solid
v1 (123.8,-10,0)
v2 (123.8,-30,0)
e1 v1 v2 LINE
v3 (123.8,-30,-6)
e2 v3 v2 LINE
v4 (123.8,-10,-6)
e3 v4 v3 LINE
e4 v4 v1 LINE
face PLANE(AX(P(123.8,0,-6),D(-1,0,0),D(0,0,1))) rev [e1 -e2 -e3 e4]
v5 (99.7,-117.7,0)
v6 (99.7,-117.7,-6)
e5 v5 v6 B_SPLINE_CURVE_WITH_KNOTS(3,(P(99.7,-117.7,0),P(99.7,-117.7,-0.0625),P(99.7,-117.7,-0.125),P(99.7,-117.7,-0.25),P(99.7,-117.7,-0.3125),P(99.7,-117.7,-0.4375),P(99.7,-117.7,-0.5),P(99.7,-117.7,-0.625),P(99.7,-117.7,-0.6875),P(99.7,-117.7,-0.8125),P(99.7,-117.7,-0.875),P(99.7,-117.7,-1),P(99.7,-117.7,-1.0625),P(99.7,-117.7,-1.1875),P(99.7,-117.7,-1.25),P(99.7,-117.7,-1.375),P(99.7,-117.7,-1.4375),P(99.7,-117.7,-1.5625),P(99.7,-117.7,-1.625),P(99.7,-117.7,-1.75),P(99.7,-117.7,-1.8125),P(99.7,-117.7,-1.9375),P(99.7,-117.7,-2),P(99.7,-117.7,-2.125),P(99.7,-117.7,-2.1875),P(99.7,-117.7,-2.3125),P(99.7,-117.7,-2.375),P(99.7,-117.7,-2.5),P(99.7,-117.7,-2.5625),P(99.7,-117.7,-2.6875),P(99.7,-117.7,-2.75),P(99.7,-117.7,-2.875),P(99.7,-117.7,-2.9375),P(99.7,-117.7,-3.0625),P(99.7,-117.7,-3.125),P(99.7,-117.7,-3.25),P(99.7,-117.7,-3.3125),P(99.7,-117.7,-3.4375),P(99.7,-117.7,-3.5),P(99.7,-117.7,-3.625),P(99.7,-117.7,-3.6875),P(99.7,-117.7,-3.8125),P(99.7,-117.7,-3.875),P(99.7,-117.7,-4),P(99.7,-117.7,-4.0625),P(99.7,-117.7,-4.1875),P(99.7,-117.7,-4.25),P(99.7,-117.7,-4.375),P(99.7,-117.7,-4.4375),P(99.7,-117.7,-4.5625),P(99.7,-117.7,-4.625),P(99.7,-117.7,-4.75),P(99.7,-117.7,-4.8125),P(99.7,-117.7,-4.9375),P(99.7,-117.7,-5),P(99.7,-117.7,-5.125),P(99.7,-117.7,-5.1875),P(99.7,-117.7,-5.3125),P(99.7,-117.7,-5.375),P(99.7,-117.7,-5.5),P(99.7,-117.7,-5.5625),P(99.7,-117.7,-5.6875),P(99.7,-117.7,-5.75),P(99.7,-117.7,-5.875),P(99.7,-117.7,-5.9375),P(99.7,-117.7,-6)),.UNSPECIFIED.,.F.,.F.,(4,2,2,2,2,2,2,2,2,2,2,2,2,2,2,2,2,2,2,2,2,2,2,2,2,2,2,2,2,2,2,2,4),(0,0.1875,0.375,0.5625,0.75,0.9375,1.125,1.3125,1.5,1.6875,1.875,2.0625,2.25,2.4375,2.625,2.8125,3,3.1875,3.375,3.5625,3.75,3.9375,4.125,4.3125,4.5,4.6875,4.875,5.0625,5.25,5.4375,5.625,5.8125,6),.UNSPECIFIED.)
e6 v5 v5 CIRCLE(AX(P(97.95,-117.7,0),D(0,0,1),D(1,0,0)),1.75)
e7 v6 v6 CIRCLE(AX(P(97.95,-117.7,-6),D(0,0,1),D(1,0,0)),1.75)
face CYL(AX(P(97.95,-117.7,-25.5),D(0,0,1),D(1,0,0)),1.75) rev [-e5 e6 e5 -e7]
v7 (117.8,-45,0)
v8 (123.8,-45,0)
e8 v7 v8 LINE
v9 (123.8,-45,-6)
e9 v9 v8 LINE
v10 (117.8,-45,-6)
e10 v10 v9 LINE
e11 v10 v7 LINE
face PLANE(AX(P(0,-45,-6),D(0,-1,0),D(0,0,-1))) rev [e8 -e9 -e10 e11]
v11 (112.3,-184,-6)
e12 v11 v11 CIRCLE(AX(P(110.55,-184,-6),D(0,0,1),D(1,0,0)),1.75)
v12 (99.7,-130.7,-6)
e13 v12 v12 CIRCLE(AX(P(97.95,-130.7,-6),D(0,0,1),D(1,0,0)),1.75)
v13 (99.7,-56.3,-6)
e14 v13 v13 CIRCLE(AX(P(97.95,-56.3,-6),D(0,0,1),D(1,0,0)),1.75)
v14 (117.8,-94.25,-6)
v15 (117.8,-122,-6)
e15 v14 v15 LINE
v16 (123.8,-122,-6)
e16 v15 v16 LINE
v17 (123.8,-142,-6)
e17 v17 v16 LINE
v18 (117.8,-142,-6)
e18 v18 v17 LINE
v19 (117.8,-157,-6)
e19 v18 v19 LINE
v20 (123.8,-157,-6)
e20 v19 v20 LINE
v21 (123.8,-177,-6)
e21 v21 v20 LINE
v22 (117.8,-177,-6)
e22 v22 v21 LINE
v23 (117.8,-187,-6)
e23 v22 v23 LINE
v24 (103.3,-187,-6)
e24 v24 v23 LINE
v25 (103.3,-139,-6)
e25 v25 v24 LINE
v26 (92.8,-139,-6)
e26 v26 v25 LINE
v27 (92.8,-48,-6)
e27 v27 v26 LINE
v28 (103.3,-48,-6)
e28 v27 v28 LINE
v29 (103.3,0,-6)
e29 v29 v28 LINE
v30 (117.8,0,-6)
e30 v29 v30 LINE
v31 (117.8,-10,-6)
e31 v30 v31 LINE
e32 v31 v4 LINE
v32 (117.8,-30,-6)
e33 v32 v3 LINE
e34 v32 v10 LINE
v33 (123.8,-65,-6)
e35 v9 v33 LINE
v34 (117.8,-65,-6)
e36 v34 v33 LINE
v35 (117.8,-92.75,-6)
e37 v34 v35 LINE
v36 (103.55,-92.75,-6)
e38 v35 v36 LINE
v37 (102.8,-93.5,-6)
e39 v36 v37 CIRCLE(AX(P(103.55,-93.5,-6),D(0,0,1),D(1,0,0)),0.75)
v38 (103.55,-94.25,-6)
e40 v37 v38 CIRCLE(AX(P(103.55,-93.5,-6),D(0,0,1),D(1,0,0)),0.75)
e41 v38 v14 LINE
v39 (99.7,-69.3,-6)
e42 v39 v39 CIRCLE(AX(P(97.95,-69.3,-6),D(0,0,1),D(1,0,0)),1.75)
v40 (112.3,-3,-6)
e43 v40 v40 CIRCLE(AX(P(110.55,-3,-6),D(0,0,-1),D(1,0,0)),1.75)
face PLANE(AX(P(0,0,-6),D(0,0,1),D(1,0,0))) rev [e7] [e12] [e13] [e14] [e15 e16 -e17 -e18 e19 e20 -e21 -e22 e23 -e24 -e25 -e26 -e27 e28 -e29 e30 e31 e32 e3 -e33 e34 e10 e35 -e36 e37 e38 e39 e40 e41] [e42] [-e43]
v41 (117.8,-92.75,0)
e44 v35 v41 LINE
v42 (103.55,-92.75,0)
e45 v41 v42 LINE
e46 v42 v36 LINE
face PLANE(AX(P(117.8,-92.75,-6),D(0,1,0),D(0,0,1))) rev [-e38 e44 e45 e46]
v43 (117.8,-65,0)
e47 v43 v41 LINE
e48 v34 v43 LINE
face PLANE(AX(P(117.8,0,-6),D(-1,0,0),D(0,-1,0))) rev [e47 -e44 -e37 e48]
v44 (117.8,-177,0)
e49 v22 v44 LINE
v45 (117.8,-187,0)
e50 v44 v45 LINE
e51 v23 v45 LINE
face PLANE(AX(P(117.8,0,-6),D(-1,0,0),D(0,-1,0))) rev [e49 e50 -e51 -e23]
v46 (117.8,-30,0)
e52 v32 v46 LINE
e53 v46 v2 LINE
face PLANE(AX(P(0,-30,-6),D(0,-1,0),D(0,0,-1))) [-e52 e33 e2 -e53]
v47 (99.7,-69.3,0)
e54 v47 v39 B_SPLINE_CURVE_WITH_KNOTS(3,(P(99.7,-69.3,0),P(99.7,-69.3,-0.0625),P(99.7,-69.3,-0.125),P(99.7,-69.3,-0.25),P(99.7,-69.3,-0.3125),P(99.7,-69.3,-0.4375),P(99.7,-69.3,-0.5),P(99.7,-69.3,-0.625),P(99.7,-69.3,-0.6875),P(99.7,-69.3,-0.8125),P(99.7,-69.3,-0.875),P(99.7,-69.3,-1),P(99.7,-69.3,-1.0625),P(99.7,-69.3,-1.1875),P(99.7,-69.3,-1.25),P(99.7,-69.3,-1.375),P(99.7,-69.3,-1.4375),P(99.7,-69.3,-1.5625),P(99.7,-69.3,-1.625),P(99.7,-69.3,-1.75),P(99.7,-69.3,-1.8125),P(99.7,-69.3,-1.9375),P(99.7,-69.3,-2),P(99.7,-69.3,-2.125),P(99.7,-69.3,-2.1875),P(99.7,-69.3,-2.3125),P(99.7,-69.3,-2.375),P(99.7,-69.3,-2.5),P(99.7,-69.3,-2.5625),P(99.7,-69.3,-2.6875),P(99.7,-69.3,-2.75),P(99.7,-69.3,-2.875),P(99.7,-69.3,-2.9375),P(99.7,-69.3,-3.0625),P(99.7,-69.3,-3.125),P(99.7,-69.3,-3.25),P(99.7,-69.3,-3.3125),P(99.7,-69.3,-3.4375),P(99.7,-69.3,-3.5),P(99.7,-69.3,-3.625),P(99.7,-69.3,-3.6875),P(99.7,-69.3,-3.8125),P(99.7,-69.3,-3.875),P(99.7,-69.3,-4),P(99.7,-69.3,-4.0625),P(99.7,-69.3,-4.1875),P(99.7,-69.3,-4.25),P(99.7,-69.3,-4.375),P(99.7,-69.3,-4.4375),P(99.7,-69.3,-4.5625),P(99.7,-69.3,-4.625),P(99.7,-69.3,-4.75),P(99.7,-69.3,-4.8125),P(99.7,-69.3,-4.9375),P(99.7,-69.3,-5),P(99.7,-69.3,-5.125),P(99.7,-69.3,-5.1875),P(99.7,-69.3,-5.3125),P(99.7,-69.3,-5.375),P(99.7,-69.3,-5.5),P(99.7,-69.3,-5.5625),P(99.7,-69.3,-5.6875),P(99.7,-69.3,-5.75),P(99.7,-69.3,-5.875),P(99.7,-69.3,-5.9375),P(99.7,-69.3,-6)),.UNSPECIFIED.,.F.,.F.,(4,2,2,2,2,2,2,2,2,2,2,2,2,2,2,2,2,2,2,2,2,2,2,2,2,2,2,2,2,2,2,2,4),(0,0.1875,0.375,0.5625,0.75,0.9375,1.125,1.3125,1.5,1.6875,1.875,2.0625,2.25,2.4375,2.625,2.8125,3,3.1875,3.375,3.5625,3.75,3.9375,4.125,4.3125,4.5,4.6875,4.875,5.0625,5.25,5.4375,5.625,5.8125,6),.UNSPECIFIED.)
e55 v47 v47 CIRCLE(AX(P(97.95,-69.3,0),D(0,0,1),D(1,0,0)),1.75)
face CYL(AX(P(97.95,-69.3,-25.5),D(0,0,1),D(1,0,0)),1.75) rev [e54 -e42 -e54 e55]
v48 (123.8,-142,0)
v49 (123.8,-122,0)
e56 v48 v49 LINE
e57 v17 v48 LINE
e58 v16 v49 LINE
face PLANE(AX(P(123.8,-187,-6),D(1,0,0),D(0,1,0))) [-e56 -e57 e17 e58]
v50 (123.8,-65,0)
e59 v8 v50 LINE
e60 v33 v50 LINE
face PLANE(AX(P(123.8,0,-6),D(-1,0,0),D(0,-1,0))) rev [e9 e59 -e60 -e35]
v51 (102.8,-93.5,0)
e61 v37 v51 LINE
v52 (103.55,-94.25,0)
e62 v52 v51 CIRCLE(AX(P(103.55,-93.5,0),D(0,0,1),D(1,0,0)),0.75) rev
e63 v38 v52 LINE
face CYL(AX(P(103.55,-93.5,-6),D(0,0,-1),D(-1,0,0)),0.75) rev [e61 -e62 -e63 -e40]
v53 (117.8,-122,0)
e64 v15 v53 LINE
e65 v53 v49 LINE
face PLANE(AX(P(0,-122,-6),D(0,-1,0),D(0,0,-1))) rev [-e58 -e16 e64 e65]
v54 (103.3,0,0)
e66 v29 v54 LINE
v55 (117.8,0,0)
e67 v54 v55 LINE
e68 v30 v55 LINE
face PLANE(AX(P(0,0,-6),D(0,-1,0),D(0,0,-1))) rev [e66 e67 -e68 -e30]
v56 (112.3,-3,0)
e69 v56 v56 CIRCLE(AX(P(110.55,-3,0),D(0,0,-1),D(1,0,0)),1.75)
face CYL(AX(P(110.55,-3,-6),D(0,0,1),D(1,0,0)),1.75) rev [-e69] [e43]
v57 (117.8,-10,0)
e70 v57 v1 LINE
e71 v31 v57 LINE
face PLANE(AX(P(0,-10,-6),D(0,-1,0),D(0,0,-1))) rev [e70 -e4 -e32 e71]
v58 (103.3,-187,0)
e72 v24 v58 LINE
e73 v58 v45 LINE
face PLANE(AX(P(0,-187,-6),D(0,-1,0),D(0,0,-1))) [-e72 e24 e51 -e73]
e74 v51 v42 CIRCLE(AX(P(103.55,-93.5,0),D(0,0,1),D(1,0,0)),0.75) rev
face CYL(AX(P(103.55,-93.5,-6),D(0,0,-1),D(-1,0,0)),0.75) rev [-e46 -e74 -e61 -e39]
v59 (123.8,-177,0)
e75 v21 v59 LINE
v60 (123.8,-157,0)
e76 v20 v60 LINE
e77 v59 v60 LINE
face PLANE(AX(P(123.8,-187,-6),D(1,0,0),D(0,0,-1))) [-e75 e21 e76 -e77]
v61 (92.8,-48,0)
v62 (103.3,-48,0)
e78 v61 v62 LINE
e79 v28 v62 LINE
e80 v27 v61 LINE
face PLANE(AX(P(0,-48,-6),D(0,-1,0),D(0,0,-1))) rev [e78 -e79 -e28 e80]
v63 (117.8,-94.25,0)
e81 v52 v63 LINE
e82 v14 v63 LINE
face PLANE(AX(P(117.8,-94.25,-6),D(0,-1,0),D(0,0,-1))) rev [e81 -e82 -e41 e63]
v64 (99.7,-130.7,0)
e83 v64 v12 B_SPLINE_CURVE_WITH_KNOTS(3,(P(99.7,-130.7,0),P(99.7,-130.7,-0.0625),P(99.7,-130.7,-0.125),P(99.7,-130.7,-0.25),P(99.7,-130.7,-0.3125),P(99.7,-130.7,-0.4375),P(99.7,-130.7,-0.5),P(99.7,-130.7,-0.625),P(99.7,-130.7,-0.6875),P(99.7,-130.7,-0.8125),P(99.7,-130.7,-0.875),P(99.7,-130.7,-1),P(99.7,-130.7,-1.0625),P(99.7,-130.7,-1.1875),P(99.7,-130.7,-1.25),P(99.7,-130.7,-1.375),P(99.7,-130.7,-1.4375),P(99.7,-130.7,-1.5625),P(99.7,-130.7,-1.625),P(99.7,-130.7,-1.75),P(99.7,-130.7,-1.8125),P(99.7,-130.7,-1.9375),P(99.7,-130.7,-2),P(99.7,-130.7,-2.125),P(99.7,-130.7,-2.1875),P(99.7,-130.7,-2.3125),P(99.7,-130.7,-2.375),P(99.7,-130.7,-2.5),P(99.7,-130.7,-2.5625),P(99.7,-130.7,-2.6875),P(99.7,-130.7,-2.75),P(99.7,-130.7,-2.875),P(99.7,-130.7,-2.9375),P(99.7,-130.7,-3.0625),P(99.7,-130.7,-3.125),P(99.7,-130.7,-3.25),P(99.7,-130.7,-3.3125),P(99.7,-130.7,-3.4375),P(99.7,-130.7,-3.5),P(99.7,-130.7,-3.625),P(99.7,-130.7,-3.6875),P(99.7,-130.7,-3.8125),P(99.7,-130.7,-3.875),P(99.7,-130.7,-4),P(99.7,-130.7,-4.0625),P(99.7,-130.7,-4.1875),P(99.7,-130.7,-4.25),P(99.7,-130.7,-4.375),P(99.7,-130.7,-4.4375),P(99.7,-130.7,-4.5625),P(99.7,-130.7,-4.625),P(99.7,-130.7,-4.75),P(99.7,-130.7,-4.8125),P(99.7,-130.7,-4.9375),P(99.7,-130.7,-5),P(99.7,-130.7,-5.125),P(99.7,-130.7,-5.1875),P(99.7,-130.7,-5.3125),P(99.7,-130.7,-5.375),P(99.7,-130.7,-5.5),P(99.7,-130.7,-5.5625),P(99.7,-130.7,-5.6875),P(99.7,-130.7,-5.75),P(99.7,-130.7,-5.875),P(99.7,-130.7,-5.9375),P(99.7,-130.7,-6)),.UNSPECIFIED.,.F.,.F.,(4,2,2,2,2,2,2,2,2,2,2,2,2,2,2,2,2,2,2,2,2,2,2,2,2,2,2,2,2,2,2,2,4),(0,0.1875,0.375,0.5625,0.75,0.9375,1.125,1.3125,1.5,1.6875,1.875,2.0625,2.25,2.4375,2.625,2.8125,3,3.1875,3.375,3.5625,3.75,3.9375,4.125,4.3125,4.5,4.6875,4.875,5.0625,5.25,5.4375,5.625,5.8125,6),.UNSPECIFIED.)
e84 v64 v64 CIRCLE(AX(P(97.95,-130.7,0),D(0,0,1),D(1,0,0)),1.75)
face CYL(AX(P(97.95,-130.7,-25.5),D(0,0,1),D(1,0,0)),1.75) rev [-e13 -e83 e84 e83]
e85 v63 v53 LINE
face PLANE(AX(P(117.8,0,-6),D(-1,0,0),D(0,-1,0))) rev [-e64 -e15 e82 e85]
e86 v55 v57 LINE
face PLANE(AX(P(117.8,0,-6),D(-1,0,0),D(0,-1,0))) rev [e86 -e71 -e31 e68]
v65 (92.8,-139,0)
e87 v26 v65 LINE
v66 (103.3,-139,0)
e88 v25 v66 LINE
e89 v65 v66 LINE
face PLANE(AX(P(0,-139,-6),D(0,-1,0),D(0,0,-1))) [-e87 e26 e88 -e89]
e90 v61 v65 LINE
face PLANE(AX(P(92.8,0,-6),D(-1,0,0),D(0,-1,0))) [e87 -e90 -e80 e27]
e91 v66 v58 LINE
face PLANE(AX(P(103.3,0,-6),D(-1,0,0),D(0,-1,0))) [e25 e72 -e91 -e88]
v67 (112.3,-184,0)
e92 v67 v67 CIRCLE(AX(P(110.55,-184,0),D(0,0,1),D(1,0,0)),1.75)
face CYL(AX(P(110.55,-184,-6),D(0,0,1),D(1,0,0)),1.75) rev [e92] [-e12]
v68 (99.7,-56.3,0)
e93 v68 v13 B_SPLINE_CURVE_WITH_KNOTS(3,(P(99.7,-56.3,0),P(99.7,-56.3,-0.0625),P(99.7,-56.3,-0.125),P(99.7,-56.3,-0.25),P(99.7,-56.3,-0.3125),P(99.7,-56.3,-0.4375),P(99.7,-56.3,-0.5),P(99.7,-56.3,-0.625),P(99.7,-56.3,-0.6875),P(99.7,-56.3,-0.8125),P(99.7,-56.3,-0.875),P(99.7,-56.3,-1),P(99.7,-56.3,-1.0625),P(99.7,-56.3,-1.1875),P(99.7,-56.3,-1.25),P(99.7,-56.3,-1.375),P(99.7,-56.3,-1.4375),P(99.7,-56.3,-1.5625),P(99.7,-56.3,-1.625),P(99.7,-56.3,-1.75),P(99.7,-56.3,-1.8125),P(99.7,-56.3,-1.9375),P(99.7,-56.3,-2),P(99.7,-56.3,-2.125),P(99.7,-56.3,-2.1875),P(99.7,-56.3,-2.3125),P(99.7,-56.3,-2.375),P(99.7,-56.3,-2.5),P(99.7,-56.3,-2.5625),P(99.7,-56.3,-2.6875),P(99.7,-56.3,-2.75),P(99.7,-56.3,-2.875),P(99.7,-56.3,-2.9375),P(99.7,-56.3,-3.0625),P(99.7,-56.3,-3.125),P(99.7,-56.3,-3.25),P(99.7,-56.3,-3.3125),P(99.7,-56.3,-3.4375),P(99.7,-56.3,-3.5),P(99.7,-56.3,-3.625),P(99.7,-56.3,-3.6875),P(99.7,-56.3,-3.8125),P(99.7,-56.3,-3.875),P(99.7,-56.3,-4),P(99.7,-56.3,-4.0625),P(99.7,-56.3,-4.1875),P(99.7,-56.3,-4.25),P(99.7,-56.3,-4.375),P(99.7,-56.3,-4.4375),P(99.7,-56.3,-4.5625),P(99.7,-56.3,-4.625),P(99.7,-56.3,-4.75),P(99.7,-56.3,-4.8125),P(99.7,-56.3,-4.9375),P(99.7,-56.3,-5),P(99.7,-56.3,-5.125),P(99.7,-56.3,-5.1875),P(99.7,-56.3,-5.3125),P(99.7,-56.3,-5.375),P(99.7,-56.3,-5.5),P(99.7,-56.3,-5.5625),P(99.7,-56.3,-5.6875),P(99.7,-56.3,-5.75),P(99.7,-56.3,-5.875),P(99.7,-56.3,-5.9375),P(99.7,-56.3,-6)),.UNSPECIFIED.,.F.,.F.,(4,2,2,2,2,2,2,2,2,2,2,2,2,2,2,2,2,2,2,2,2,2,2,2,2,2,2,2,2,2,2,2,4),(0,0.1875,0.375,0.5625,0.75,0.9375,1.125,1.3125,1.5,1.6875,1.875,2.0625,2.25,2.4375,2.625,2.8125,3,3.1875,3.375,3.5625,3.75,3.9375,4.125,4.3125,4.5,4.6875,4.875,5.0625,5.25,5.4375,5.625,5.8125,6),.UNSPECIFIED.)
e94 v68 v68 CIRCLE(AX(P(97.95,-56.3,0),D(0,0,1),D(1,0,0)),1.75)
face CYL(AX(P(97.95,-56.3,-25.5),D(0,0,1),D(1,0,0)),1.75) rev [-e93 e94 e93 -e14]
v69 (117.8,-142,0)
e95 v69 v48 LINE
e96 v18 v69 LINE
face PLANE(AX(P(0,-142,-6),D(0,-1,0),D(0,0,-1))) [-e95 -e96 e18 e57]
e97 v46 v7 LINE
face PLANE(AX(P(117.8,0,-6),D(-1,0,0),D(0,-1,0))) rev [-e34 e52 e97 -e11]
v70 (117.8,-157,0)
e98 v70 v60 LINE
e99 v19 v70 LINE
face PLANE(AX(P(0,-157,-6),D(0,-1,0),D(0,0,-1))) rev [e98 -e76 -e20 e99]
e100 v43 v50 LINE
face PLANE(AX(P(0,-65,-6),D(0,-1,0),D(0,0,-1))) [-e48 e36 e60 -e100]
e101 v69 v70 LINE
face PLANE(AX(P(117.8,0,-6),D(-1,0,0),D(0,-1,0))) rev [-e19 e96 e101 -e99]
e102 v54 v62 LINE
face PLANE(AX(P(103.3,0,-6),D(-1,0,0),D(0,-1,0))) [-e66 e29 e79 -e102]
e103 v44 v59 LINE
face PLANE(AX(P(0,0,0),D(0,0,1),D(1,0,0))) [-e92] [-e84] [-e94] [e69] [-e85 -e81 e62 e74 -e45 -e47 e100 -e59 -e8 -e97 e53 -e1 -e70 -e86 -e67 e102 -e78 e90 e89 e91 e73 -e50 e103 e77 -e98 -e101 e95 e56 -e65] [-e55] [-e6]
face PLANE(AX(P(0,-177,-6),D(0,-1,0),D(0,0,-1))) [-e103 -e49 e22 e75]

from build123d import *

# Parameters (mm, degrees)
ESBO_O1_W                = 10.5
ESBO_O1_H                = 91
RESSALTO_EXTRUS_O1_DEPTH = 6
ESBO_O2_W                = 6
ESBO_O2_H                = 20
RESSALTO_EXTRUS_O2_DEPTH = 6
ESBO_O3_R                = 1.75
CORTE_EXTRUS_O2_DEPTH    = 25.5
ESBO_O4_W                = 15
ESBO_O4_H                = 1.5
CORTE_EXTRUS_O3_DEPTH    = 6
FILETE1_R                = 0.75
ESBO_O5_R                = 1.75
CORTE_EXTRUS_O4_DEPTH    = 6


with BuildPart() as part:
    # Esboço1 → Ressalto-extrusão1 (new body)
    with BuildSketch(Plane.XY):
        with Locations((98.05, -93.5)):
            Rectangle(ESBO_O1_W, ESBO_O1_H)
        Polygon((117.8, 0), (103.3, 0), (103.3, -48), (103.3, -139), (103.3, -187), (117.8, -187), align=None)
    extrude(amount=-RESSALTO_EXTRUS_O1_DEPTH)

    # Esboço2 → Ressalto-extrusão2 (add)
    with BuildSketch(Plane.XY):
        with Locations((120.8, -20)):
            Rectangle(ESBO_O2_W, ESBO_O2_H)
        with Locations((120.8, -55)):
            Rectangle(ESBO_O2_W, ESBO_O2_H)
    ressalto_extrus_o2 = extrude(amount=-RESSALTO_EXTRUS_O2_DEPTH)

    # Espelhar1: Ressalto-extrusão2 across plane
    add(ressalto_extrus_o2.mirror(Plane.ZX.offset(-93.5)))

    # Esboço3 → Corte-extrusão2 (cut)
    with BuildSketch(Plane.XY):
        with Locations((97.95, -56.3)):
            Circle(ESBO_O3_R)
        with Locations((97.95, -69.3)):
            Circle(ESBO_O3_R)
        with Locations((97.95, -117.7)):
            Circle(ESBO_O3_R)
        with Locations((97.95, -130.7)):
            Circle(ESBO_O3_R)
    extrude(amount=-CORTE_EXTRUS_O2_DEPTH, mode=Mode.SUBTRACT)

    # Esboço4 → Corte-extrusão3 (cut)
    with BuildSketch(Plane.XY):
        with Locations((110.3, -93.5)):
            Rectangle(ESBO_O4_W, ESBO_O4_H)
    extrude(amount=-CORTE_EXTRUS_O3_DEPTH, mode=Mode.SUBTRACT)

    # Filete1
    filete1_edges = [part.edges().sort_by_distance(p)[0] for p in [
        (102.8, -94.25, -3),
        (102.8, -92.75, -3),
    ]]
    fillet(filete1_edges, radius=FILETE1_R - 0.0001)  # a hair under: the kernel refuses the full size

    # Esboço5 → Corte-extrusão4 (cut)
    with BuildSketch(Plane.XY):
        with Locations((110.55, -184)):
            Circle(ESBO_O5_R)
    corte_extrus_o4 = extrude(amount=-CORTE_EXTRUS_O4_DEPTH, mode=Mode.SUBTRACT)

    # Espelhar2: Corte-extrusão4 across plane
    add(corte_extrus_o4.mirror(Plane.ZX.offset(-93.5)), mode=Mode.SUBTRACT)


solid = part.part
